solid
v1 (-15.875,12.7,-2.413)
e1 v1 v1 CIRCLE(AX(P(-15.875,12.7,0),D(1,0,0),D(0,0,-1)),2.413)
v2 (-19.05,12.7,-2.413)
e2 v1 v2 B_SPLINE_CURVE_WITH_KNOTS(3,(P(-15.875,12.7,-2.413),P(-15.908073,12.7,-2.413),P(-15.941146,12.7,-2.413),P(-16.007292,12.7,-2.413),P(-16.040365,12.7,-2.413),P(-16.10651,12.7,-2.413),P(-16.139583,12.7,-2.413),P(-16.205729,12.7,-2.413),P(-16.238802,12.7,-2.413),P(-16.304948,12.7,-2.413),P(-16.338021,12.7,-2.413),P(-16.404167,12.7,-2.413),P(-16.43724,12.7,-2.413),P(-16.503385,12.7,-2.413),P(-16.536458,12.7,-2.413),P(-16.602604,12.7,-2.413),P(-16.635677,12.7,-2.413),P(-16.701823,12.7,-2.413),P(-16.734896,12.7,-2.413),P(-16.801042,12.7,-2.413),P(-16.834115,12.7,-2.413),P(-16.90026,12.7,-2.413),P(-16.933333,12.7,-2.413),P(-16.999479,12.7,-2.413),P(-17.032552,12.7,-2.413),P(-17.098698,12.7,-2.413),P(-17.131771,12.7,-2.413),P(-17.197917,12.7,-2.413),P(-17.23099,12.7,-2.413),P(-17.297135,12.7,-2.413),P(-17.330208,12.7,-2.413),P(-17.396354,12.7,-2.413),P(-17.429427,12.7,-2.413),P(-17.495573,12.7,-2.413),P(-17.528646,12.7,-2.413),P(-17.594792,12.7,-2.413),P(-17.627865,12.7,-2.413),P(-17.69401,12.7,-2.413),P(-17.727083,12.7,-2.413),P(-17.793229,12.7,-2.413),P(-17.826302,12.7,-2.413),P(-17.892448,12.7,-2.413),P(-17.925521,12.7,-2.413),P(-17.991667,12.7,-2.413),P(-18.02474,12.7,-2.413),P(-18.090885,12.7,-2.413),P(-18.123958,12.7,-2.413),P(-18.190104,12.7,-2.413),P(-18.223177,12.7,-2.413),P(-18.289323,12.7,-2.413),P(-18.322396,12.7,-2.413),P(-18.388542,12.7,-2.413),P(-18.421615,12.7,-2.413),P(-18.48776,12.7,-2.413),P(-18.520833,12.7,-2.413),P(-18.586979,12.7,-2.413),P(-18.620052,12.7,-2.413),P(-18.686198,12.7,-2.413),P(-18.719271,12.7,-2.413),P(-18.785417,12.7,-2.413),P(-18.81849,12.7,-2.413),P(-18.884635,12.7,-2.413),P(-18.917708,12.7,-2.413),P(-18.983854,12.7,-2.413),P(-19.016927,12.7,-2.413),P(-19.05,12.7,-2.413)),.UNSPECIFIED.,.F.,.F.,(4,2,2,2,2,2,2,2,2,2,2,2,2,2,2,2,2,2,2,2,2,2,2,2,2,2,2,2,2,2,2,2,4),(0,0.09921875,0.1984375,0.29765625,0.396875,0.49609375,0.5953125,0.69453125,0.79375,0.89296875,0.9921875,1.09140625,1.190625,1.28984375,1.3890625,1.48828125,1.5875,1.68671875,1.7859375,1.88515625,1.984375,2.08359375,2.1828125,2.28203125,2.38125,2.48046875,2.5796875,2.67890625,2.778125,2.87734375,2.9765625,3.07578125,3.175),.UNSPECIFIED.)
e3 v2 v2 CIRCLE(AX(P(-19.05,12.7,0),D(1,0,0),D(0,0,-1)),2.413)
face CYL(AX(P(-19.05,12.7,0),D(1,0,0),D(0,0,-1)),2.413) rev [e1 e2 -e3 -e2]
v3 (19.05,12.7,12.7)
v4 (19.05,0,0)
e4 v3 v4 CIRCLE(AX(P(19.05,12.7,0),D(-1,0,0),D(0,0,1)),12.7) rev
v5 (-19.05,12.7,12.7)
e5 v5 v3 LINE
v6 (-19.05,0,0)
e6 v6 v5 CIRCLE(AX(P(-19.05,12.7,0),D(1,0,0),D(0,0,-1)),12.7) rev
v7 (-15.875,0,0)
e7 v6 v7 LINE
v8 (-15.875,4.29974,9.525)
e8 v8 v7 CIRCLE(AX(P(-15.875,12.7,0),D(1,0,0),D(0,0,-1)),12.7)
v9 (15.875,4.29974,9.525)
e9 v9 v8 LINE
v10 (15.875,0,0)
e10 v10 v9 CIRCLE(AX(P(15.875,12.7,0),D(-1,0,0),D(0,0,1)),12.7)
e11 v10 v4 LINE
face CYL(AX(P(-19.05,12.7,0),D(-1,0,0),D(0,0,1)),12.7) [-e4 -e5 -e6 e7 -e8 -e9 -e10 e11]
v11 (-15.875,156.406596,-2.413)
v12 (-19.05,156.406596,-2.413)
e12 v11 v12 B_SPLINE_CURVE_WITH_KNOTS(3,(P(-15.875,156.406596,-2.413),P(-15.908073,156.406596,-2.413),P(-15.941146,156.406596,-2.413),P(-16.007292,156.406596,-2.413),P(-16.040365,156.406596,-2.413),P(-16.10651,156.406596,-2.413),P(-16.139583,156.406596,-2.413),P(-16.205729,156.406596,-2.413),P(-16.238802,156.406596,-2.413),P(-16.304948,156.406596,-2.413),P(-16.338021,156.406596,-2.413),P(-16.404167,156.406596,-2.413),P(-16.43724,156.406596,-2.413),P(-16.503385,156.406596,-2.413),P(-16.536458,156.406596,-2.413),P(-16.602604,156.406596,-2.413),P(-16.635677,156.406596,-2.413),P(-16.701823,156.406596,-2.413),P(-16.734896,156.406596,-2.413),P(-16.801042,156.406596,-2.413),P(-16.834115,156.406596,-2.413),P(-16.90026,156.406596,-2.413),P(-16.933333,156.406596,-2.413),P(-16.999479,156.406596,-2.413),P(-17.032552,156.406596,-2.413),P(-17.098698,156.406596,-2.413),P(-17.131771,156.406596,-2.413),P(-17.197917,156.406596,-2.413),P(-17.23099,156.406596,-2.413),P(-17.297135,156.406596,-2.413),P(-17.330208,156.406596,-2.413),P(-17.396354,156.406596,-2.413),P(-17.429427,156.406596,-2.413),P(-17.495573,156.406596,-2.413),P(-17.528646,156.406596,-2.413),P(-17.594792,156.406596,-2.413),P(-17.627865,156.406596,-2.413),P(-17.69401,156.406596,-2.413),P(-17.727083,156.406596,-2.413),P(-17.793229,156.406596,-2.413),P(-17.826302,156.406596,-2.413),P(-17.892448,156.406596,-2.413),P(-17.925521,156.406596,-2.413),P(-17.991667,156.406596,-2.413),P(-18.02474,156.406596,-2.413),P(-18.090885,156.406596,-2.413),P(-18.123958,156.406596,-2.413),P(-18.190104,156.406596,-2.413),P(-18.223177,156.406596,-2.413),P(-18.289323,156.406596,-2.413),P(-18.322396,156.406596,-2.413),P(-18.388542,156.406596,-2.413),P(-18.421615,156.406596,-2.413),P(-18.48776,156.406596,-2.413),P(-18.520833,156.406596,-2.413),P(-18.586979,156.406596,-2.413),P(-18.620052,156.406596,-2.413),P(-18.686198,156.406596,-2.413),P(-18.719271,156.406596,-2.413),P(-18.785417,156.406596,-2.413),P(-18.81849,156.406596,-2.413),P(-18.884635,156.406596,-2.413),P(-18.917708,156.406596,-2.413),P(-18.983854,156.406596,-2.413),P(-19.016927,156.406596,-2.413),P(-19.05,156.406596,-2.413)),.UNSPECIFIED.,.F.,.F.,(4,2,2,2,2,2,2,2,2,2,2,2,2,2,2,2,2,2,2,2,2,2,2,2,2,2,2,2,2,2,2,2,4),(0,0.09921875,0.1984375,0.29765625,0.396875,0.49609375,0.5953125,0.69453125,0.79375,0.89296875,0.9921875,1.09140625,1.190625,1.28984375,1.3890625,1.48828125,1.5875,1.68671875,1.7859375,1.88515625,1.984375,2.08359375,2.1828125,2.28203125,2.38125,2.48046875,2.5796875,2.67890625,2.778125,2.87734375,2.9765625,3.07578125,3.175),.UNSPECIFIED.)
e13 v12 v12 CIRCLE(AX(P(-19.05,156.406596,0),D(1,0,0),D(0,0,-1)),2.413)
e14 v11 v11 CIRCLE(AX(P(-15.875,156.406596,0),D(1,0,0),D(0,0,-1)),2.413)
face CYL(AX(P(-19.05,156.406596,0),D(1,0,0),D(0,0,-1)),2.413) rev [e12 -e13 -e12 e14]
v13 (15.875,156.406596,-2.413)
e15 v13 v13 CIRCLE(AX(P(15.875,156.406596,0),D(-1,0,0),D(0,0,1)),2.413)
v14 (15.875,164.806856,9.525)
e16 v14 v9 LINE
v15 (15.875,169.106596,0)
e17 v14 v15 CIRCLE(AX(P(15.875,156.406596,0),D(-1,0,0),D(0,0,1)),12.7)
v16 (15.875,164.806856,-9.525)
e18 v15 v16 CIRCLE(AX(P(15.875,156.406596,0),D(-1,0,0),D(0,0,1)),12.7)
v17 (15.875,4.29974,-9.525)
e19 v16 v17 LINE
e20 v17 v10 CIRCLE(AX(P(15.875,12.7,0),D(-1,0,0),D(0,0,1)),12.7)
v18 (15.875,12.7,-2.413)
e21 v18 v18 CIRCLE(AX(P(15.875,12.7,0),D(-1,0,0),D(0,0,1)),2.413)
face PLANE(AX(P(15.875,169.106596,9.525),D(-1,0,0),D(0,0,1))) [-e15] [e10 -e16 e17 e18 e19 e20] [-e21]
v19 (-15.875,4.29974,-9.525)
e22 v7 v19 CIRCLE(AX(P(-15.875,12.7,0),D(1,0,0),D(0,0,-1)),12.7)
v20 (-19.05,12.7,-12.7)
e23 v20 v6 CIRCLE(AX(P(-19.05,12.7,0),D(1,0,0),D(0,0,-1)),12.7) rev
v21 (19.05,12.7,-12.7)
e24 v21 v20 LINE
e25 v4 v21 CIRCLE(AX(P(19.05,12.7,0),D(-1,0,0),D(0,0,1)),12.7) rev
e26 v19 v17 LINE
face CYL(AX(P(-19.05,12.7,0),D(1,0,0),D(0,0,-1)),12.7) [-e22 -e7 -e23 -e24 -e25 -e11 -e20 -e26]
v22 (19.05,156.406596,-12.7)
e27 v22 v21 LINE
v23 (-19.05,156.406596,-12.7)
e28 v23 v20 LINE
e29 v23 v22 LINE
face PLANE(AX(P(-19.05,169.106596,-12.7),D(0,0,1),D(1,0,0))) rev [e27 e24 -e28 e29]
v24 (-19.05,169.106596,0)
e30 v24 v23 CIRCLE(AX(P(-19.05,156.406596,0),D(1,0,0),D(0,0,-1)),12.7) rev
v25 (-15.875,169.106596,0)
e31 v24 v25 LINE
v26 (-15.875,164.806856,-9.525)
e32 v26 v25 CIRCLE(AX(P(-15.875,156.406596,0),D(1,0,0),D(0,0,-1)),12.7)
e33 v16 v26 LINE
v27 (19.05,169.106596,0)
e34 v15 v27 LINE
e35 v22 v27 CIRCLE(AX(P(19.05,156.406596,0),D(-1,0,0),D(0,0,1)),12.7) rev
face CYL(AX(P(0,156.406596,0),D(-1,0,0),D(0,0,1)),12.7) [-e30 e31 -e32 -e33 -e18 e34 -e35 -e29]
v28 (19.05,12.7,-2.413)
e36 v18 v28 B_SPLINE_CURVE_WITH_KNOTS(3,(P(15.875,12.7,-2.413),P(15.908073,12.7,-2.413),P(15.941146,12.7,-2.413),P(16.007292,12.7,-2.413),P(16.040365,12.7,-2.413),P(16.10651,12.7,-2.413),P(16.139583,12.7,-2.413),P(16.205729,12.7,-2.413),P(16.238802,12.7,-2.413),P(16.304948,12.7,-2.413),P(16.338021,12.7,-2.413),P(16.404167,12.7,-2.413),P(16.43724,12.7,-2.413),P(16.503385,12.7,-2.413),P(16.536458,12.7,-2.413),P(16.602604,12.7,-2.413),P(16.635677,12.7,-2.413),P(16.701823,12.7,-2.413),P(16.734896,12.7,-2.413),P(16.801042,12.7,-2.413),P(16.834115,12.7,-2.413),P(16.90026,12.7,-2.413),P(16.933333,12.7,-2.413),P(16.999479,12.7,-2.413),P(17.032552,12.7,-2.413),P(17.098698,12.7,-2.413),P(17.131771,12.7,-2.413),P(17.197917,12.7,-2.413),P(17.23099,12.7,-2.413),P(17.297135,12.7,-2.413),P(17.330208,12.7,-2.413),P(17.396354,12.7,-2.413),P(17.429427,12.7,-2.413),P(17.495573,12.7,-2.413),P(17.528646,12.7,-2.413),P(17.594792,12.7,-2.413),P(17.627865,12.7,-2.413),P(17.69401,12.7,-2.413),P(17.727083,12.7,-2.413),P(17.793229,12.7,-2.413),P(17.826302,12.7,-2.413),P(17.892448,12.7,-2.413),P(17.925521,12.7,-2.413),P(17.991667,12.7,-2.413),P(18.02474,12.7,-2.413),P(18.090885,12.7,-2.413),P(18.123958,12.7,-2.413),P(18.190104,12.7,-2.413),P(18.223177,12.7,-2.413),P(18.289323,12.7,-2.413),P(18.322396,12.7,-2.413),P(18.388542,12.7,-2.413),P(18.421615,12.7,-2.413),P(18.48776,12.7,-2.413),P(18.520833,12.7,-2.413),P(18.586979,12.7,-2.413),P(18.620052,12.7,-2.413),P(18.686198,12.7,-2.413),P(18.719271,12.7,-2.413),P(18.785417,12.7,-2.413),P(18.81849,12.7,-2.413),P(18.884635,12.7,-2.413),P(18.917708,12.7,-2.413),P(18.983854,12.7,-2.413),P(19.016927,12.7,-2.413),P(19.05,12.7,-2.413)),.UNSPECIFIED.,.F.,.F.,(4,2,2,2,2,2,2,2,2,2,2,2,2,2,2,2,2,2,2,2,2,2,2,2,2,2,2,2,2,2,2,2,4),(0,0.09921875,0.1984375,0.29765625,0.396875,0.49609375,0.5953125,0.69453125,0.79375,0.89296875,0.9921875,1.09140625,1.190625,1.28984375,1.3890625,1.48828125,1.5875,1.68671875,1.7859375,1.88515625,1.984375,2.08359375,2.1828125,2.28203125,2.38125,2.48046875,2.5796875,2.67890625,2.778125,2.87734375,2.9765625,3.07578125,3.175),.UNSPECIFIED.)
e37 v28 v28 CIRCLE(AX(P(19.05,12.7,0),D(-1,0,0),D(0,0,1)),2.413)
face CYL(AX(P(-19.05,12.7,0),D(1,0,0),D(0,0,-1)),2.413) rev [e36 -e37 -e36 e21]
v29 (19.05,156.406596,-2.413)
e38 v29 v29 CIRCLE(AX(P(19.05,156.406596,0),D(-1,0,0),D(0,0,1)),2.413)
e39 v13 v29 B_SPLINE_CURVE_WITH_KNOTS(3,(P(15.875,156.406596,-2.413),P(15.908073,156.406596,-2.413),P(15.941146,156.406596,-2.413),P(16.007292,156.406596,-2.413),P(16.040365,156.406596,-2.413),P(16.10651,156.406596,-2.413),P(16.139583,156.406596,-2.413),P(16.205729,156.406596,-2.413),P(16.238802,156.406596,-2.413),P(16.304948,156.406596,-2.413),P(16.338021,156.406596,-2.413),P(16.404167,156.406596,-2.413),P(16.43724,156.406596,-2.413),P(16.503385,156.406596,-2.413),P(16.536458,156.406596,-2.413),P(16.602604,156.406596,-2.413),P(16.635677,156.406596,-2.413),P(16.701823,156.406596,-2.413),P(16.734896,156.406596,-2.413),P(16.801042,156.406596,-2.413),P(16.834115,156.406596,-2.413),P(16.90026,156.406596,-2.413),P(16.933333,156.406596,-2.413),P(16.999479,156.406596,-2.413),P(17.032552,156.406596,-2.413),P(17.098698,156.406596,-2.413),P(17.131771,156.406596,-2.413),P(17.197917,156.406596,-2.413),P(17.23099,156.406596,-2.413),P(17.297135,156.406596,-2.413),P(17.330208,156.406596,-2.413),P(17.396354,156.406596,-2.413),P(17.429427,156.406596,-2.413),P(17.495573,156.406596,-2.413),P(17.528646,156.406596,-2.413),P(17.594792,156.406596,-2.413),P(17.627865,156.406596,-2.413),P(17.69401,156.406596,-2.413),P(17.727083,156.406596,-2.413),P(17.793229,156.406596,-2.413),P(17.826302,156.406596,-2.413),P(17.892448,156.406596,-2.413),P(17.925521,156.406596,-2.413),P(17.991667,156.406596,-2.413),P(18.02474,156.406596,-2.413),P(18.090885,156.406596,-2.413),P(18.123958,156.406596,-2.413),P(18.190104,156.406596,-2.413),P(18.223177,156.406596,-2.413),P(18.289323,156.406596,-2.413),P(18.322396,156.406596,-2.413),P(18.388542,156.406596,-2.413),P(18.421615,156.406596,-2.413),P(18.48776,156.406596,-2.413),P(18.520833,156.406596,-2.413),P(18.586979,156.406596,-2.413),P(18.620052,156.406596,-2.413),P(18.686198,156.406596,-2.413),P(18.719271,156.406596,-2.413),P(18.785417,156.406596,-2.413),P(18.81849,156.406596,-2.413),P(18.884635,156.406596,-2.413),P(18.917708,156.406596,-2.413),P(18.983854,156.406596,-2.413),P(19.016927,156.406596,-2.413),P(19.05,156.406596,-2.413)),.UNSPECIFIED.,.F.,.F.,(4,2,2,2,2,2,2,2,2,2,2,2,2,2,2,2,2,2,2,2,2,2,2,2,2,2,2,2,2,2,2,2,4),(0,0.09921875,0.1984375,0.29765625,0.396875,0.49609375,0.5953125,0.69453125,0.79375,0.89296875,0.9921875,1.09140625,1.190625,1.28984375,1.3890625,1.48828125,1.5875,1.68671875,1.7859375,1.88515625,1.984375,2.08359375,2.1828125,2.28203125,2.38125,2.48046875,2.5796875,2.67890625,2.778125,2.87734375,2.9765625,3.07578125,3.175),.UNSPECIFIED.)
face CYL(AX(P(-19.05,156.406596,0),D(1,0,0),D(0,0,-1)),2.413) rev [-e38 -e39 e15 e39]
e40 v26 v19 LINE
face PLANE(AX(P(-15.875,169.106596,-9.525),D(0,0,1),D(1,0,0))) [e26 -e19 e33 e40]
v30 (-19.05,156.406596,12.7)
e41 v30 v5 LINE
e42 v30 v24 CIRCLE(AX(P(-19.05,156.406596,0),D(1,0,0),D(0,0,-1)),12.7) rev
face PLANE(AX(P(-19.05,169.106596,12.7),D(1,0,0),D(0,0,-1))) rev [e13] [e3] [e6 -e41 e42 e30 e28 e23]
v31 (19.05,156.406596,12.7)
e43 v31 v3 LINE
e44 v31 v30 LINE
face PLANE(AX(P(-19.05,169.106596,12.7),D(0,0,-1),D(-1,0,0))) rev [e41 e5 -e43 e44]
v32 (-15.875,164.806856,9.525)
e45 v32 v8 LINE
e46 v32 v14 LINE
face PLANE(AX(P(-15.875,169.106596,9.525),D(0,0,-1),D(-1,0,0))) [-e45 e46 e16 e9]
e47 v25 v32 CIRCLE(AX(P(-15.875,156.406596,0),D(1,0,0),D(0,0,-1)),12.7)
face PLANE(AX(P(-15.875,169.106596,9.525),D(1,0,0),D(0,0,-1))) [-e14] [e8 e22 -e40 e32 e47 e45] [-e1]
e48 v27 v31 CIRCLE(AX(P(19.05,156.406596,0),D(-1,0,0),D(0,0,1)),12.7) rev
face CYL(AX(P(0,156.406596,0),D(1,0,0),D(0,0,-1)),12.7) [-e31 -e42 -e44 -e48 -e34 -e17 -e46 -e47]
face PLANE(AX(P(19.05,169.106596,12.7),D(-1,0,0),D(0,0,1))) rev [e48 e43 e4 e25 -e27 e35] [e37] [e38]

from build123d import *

# Parameters (mm, degrees)
SKETCH1_W               = 38.1
SKETCH1_H               = 25.4
SKETCH1_W_2             = 31.75
SKETCH1_H_2             = 19.05
BOSS_EXTRUDE1_DEPTH     = 169.106596
CUT_EXTRUDE1_DEPTH      = 174.810071085
CUT_EXTRUDE1_DEPTH_BACK = 174.810071085
SKETCH2_R               = 2.413
FILLET7_R               = 12.7


with BuildPart() as part:
    # Sketch1 → Boss-Extrude1 (new body)
    with BuildSketch(Plane(origin=(0, 0, 0), x_dir=(1, 0, 0), z_dir=(0, 1, 0))):
        Rectangle(SKETCH1_W, SKETCH1_H)
        Rectangle(SKETCH1_W_2, SKETCH1_H_2, mode=Mode.SUBTRACT)
    extrude(amount=BOSS_EXTRUDE1_DEPTH)

    # Sketch2 → Cut-Extrude1 (cut, two sides: drawn at the far end of the back side and taken through both)
    with BuildSketch(Plane(origin=(19.05, 0, 0), x_dir=(0, 0, -1), z_dir=(1, 0, 0)).offset(-CUT_EXTRUDE1_DEPTH_BACK)):
        with Locations((0, 156.406596)):
            Circle(SKETCH2_R)
        with Locations((0, 12.7)):
            Circle(SKETCH2_R)
    extrude(amount=CUT_EXTRUDE1_DEPTH + CUT_EXTRUDE1_DEPTH_BACK, mode=Mode.SUBTRACT)

    # Fillet7
    # the kernel refuses this fillet: 12.7 mm, written as the material it takes off along each edge
    with BuildSketch(Plane(origin=(50.8, 169.106596, -12.7), x_dir=(0, 0, 1), z_dir=(-1, 0, 0)), Plane(origin=(-50.8, 0, 12.7), x_dir=(0, 1, 0), z_dir=(1, 0, 0))) as fillet7_piece_1:
        with BuildLine():
            CenterArc((FILLET7_R, -FILLET7_R), FILLET7_R, 90, 90)
            Line((0, -FILLET7_R), (0, 0))
            Line((0, 0), (FILLET7_R, 0))
        make_face()
    extrude(amount=101.6, mode=Mode.SUBTRACT)
    with BuildSketch(Plane(origin=(50.8, 0, -12.7), x_dir=(0, 0, 1), z_dir=(-1, 0, 0)), Plane(origin=(-50.8, 169.106596, 12.7), x_dir=(0, -1, 0), z_dir=(1, 0, 0))) as fillet7_piece_2:
        with BuildLine():
            CenterArc((FILLET7_R, FILLET7_R), FILLET7_R, 180, 90)
            Line((0, FILLET7_R), (0, 0))
            Line((0, 0), (FILLET7_R, 0))
        make_face()
    extrude(amount=101.6, mode=Mode.SUBTRACT)


solid = part.part
